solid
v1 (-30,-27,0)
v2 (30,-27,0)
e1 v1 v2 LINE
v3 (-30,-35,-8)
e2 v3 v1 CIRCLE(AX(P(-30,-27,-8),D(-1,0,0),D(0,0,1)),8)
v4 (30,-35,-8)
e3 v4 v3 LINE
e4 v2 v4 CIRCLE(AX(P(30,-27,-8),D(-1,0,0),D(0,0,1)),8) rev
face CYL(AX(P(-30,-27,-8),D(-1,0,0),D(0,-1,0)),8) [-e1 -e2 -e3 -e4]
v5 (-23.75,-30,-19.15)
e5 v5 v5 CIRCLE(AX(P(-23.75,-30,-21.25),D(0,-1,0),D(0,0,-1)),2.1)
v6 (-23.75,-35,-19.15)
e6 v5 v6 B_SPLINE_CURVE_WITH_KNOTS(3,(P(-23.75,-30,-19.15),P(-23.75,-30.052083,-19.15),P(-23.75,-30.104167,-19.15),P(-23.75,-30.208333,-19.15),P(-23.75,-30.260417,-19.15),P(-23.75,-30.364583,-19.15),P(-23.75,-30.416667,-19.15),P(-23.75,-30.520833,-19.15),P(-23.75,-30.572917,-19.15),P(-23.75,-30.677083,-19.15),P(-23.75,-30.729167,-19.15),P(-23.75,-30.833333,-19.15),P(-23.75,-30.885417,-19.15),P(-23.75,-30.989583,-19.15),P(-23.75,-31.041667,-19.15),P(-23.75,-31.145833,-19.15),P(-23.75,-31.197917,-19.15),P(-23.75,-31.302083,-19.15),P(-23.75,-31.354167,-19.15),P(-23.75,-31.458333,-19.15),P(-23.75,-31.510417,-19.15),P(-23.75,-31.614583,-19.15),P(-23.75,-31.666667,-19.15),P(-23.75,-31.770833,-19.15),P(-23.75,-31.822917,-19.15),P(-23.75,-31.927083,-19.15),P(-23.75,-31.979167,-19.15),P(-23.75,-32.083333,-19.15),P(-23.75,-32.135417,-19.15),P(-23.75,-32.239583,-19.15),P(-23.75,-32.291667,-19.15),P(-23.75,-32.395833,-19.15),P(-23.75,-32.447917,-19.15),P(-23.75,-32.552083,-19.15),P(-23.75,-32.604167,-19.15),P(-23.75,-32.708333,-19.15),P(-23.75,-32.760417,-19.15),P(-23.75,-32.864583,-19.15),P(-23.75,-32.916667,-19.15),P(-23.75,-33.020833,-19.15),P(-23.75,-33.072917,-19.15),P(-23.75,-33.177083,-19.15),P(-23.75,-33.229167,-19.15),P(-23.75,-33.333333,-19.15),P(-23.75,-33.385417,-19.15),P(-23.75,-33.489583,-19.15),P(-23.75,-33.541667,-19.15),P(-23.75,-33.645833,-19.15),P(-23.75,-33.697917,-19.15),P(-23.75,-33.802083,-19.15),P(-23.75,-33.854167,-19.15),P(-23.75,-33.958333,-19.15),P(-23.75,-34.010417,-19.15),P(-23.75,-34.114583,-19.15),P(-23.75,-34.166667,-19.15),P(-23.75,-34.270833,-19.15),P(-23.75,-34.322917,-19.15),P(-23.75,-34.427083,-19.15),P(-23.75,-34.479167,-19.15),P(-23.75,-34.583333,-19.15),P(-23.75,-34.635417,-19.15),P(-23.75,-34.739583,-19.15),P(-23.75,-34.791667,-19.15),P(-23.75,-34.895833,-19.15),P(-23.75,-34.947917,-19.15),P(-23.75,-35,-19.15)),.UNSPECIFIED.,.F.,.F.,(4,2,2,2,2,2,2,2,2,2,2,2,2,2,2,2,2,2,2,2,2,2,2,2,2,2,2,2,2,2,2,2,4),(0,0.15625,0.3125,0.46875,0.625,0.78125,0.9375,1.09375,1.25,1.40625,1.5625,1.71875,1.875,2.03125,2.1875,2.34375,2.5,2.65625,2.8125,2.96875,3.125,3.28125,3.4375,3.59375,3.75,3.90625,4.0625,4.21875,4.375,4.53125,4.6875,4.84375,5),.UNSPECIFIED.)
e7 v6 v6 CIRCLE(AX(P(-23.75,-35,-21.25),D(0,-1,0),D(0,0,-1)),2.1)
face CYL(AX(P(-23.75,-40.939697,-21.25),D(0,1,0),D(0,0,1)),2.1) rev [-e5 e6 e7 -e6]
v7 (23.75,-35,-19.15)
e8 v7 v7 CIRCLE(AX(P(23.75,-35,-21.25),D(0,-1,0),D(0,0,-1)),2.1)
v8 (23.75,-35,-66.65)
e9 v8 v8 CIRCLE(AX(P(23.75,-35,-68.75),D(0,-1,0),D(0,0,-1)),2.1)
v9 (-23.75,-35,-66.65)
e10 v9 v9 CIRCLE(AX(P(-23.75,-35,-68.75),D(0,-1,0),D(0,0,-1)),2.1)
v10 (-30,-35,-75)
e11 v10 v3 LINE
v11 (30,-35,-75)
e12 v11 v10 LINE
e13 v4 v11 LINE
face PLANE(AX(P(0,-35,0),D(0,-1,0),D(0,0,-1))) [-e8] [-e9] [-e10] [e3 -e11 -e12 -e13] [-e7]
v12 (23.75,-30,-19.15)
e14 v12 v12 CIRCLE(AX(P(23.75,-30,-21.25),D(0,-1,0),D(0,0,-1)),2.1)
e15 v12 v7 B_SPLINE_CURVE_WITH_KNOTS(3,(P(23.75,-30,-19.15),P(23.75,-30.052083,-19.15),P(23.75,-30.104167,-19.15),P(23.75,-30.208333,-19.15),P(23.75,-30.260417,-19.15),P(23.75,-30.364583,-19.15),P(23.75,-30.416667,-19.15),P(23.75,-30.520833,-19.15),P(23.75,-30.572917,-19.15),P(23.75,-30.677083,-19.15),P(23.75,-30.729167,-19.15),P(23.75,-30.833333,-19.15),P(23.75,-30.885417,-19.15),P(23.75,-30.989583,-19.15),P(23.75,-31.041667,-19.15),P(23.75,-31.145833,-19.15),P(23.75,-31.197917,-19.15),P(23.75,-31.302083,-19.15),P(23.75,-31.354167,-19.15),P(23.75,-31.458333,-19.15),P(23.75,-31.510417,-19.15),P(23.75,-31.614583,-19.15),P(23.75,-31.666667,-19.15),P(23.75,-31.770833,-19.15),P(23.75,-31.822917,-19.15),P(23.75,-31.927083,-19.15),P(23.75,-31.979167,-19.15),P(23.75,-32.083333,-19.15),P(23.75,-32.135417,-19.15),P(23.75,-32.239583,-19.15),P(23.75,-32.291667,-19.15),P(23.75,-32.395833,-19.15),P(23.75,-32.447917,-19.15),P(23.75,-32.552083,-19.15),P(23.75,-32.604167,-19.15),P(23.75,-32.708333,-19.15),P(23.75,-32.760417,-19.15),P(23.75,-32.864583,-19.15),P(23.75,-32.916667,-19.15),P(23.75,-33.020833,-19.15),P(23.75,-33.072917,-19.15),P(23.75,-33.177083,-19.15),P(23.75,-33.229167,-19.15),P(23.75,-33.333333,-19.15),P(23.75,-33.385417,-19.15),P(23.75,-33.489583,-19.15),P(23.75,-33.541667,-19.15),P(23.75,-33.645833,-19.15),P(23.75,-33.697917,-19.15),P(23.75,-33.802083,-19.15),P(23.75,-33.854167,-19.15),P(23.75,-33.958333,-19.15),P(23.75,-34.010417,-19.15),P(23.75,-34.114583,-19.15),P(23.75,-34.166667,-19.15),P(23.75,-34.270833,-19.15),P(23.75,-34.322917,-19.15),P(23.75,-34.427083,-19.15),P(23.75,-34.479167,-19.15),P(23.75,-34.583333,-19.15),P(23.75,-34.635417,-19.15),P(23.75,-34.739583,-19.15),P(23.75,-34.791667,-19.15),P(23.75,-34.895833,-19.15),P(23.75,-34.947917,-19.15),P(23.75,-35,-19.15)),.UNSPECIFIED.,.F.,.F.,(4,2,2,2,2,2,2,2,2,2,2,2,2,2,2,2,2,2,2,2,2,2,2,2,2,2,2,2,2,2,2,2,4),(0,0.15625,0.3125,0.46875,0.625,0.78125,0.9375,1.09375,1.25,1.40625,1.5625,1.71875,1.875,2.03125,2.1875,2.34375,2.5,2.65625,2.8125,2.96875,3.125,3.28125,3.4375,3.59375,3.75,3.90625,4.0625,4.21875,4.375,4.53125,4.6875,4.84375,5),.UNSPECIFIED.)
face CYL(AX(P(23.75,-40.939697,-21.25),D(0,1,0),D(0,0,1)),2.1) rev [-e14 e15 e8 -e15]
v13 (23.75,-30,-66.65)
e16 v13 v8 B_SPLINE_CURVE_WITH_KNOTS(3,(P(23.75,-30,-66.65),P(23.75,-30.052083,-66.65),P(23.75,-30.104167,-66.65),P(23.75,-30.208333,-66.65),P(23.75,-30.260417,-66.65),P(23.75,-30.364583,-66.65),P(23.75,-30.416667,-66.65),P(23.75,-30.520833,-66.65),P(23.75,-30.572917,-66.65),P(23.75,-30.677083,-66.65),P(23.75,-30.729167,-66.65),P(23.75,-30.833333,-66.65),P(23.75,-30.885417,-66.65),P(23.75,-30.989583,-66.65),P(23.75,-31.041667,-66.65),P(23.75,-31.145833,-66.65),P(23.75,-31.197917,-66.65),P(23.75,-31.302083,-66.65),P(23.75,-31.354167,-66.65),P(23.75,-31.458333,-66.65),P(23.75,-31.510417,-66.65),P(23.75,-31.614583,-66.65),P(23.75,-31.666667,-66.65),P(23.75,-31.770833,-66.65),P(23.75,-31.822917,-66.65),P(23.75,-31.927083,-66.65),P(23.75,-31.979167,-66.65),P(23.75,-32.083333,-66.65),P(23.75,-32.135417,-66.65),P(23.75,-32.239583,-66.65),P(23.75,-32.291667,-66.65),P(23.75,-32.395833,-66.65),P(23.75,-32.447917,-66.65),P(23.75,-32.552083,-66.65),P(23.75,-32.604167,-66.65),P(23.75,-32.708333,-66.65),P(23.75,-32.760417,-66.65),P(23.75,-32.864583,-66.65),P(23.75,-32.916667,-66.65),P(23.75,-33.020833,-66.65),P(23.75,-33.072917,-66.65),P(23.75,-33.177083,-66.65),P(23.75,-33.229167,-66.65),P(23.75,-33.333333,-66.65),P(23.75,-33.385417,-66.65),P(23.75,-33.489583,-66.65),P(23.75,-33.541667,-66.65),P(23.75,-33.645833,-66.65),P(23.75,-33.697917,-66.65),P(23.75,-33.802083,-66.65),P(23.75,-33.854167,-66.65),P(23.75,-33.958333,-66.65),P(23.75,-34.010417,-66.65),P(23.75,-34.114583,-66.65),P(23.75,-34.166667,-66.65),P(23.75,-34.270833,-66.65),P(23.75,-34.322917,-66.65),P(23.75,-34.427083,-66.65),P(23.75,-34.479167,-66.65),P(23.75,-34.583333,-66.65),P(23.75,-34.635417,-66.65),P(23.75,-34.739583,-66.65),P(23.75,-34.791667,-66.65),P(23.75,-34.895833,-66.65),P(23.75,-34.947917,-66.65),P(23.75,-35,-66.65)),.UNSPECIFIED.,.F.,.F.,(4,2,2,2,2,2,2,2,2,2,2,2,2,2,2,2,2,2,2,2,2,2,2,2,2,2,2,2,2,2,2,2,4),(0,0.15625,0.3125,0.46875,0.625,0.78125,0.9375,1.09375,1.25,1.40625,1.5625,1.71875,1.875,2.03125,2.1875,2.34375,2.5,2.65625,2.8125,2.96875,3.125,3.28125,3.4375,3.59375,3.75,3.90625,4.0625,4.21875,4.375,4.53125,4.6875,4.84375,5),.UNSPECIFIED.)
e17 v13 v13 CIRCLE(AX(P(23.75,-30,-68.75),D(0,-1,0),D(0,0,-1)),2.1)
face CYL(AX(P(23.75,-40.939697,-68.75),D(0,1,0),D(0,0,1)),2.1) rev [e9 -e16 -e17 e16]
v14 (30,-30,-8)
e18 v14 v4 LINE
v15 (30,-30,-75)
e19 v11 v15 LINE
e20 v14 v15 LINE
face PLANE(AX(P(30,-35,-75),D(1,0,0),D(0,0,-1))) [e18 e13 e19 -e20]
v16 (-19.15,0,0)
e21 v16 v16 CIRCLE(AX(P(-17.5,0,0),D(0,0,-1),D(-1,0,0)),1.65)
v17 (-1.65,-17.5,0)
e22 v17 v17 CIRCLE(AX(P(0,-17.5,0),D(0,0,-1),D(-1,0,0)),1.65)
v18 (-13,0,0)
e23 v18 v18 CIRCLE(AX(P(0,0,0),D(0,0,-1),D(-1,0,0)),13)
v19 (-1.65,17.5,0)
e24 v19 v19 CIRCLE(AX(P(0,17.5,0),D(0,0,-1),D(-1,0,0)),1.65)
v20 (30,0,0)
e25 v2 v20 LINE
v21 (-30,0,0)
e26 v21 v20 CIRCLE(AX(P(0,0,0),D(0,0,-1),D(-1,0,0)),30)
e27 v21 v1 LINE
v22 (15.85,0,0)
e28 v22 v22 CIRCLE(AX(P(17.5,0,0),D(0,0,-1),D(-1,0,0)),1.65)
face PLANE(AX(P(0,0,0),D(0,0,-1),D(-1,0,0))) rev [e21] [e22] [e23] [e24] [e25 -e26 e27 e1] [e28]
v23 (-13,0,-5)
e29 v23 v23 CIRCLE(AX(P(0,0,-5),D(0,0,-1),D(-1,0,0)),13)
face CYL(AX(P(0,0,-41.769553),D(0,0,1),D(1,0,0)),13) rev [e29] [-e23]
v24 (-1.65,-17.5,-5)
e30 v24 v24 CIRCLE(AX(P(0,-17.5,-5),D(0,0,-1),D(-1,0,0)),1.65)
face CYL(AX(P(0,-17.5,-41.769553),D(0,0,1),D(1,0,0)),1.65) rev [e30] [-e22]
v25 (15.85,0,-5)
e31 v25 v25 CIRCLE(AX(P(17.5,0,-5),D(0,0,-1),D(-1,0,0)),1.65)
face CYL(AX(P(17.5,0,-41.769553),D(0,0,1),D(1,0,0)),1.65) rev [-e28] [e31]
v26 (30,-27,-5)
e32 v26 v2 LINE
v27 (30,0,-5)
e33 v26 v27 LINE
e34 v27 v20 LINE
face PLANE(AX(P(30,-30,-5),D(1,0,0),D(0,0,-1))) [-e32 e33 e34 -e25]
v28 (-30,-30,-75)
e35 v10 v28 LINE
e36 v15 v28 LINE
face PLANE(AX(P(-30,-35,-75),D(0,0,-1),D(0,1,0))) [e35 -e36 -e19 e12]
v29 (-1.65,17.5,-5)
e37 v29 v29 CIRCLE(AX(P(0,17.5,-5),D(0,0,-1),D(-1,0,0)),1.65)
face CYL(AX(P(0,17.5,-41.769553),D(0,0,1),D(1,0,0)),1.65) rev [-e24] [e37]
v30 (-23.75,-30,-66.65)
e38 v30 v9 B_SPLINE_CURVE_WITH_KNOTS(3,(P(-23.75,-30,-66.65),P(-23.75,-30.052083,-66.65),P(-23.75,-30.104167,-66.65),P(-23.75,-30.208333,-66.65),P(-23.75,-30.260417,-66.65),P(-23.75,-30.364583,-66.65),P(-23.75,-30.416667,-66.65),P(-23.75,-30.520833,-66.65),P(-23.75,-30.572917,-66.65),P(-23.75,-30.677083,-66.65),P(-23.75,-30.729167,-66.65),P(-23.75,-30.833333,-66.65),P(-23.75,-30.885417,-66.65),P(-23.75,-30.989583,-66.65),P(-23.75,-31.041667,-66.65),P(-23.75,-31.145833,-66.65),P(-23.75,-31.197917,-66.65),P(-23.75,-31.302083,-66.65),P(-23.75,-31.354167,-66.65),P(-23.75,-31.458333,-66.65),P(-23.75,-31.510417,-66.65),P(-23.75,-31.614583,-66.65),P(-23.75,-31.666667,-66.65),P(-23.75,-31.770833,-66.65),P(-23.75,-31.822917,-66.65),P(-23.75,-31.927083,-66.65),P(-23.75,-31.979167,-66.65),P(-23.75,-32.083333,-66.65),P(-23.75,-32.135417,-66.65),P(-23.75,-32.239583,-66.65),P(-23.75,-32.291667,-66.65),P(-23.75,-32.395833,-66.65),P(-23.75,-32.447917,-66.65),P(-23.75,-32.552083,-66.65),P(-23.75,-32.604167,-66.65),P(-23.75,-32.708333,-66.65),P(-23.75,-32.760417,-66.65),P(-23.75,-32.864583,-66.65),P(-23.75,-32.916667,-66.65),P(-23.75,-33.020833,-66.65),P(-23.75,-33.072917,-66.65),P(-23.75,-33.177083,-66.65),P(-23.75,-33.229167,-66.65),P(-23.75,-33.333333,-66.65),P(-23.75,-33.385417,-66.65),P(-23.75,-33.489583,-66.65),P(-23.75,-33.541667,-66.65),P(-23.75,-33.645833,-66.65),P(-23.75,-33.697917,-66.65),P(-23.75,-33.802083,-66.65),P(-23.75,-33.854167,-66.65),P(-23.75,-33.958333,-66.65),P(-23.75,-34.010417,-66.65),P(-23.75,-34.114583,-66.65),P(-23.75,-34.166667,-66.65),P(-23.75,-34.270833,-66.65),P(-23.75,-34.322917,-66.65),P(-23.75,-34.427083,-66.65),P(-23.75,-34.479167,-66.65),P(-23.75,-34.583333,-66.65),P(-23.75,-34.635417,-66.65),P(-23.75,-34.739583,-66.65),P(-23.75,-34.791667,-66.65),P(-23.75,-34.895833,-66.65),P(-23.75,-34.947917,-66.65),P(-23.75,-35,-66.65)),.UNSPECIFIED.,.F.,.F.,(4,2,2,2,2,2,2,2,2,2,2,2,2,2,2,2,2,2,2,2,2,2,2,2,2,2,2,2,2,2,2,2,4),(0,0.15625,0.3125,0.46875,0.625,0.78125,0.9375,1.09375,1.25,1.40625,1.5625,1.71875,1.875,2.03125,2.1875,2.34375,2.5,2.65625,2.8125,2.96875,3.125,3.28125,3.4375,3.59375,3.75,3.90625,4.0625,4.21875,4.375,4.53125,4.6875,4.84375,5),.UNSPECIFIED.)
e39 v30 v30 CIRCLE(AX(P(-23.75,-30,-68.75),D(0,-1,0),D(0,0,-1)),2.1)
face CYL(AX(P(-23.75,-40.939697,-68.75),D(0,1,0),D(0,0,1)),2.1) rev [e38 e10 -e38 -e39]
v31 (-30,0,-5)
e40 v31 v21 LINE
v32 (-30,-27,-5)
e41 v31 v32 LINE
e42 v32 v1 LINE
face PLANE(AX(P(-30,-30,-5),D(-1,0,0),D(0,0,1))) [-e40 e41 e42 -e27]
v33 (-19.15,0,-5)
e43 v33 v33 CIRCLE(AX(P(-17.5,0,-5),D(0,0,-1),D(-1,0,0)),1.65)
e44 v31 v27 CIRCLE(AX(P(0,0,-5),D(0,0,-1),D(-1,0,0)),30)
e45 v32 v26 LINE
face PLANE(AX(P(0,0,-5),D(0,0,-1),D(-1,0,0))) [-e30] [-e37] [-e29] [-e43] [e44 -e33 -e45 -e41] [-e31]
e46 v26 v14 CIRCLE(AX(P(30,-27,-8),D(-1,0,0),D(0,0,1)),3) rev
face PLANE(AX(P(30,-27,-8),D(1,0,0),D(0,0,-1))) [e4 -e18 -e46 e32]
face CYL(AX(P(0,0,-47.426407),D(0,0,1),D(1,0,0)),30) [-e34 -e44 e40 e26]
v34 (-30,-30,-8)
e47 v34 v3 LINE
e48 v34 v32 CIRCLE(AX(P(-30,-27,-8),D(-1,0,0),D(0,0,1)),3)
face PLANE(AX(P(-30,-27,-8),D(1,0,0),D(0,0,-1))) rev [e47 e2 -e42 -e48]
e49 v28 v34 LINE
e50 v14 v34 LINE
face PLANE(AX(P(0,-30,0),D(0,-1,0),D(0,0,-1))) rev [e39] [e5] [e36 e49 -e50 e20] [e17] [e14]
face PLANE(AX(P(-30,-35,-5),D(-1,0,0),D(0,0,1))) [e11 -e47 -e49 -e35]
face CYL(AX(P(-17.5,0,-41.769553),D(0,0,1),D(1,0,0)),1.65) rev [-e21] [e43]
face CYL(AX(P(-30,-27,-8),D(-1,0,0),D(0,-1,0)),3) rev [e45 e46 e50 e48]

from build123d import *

# Parameters (mm, degrees)
SKETCH_10_W                      = 60
SKETCH_10_H                      = 60
SM_BASE_FLANGE_2_DEPTH           = 5
SM_EDGE_FLANGE_2_STRIP_W         = 26
SM_EDGE_FLANGE_2_STRIP_H         = 5
SM_EDGE_FLANGE_2_STRIP_CUT_DEPTH = 60
SM_EDGE_FLANGE_2_DEPTH           = 60
SKETCH_19_R                      = 1.65
SKETCH_19_R_2                    = 13
CUT_EXTRUDE_2_DEPTH              = 5
CUT_EXTRUDE_START                = -30
SKETCH_28_R                      = 2.1
CUT_EXTRUDE_4_DEPTH              = 5
CUT_EXTRUDE_5_DEPTH              = 5


# Sheet-metal steps are written as plain solids
with BuildPart() as part:
    # 草图10 → 基体-法兰2 (new body)
    with BuildSketch(Plane.XY):
        Rectangle(SKETCH_10_W, SKETCH_10_H)
    extrude(amount=-SM_BASE_FLANGE_2_DEPTH)

    # 边线-法兰2 strip (across the edge) → 边线-法兰2 strip cut (cut)
    with BuildSketch(Plane(origin=(30, -30, -5), x_dir=(0, 1, 0), z_dir=(-1, 0, 0))):
        with Locations((-10, -2.5)):
            Rectangle(SM_EDGE_FLANGE_2_STRIP_W, SM_EDGE_FLANGE_2_STRIP_H)
    extrude(amount=SM_EDGE_FLANGE_2_STRIP_CUT_DEPTH, mode=Mode.SUBTRACT)

    # 边线-法兰2 section (across the edge) → 边线-法兰2 (add)
    with BuildSketch(Plane(origin=(30, -30, -5), x_dir=(0, 1, 0), z_dir=(-1, 0, 0))):
        with BuildLine():
            Line((-5, 3), (-5, 70))
            Line((-5, 70), (0, 70))
            Line((0, 70), (0, 3))
            ThreePointArc((0, 3), (0.878679656, 0.878679656), (3, 0))
            Line((3, 0), (3, -5))
            ThreePointArc((3, -5), (-2.656854249, -2.656854249), (-5, 3))
        make_face()
    extrude(amount=SM_EDGE_FLANGE_2_DEPTH)

    # 草图19 → 切除-拉伸2 (cut)
    with BuildSketch(Plane.XY):
        with Locations(Location((-17.5, 0, 0), (0, 0, 180))):
            Circle(SKETCH_19_R)
        with Locations(Location((17.5, 0, 0), (0, 0, 180))):
            Circle(SKETCH_19_R)
        with Locations(Location((0, 17.5, 0), (0, 0, 180))):
            Circle(SKETCH_19_R)
        with Locations(Location((0, -17.5, 0), (0, 0, 180))):
            Circle(SKETCH_19_R)
        with Locations(Location((0, 0, 0), (0, 0, 180))):
            Circle(SKETCH_19_R_2)
    extrude(amount=-CUT_EXTRUDE_2_DEPTH, mode=Mode.SUBTRACT)

    # 草图28 → 切除-拉伸4 (cut)
    with BuildSketch(Plane(origin=(0, 0, 0), x_dir=(1, 0, 0), z_dir=(0, 1, 0)).offset(CUT_EXTRUDE_START)):
        with Locations(Location((-23.75, 21.25, 0), (0, 0, 270))):
            Circle(SKETCH_28_R)
        with Locations(Location((-23.75, 68.75, 0), (0, 0, 270))):
            Circle(SKETCH_28_R)
        with Locations(Location((23.75, 68.75, 0), (0, 0, 270))):
            Circle(SKETCH_28_R)
        with Locations(Location((23.75, 21.25, 0), (0, 0, 270))):
            Circle(SKETCH_28_R)
    extrude(amount=-CUT_EXTRUDE_4_DEPTH, mode=Mode.SUBTRACT)

    # 草图29 → 切除-拉伸5 (cut)
    with BuildSketch(Plane.XY):
        with BuildLine():
            ThreePointArc((-30, 0), (-21.213203436, 21.213203436), (0, 30))
            Line((0, 30), (-30, 30))
            Line((-30, 30), (-30, 0))
        make_face()
        with BuildLine():
            Line((30, 30), (0, 30))
            ThreePointArc((0, 30), (21.213203436, 21.213203436), (30, 0))
            Line((30, 0), (30, 30))
        make_face()
    extrude(amount=-CUT_EXTRUDE_5_DEPTH, mode=Mode.SUBTRACT)


solid = part.part
